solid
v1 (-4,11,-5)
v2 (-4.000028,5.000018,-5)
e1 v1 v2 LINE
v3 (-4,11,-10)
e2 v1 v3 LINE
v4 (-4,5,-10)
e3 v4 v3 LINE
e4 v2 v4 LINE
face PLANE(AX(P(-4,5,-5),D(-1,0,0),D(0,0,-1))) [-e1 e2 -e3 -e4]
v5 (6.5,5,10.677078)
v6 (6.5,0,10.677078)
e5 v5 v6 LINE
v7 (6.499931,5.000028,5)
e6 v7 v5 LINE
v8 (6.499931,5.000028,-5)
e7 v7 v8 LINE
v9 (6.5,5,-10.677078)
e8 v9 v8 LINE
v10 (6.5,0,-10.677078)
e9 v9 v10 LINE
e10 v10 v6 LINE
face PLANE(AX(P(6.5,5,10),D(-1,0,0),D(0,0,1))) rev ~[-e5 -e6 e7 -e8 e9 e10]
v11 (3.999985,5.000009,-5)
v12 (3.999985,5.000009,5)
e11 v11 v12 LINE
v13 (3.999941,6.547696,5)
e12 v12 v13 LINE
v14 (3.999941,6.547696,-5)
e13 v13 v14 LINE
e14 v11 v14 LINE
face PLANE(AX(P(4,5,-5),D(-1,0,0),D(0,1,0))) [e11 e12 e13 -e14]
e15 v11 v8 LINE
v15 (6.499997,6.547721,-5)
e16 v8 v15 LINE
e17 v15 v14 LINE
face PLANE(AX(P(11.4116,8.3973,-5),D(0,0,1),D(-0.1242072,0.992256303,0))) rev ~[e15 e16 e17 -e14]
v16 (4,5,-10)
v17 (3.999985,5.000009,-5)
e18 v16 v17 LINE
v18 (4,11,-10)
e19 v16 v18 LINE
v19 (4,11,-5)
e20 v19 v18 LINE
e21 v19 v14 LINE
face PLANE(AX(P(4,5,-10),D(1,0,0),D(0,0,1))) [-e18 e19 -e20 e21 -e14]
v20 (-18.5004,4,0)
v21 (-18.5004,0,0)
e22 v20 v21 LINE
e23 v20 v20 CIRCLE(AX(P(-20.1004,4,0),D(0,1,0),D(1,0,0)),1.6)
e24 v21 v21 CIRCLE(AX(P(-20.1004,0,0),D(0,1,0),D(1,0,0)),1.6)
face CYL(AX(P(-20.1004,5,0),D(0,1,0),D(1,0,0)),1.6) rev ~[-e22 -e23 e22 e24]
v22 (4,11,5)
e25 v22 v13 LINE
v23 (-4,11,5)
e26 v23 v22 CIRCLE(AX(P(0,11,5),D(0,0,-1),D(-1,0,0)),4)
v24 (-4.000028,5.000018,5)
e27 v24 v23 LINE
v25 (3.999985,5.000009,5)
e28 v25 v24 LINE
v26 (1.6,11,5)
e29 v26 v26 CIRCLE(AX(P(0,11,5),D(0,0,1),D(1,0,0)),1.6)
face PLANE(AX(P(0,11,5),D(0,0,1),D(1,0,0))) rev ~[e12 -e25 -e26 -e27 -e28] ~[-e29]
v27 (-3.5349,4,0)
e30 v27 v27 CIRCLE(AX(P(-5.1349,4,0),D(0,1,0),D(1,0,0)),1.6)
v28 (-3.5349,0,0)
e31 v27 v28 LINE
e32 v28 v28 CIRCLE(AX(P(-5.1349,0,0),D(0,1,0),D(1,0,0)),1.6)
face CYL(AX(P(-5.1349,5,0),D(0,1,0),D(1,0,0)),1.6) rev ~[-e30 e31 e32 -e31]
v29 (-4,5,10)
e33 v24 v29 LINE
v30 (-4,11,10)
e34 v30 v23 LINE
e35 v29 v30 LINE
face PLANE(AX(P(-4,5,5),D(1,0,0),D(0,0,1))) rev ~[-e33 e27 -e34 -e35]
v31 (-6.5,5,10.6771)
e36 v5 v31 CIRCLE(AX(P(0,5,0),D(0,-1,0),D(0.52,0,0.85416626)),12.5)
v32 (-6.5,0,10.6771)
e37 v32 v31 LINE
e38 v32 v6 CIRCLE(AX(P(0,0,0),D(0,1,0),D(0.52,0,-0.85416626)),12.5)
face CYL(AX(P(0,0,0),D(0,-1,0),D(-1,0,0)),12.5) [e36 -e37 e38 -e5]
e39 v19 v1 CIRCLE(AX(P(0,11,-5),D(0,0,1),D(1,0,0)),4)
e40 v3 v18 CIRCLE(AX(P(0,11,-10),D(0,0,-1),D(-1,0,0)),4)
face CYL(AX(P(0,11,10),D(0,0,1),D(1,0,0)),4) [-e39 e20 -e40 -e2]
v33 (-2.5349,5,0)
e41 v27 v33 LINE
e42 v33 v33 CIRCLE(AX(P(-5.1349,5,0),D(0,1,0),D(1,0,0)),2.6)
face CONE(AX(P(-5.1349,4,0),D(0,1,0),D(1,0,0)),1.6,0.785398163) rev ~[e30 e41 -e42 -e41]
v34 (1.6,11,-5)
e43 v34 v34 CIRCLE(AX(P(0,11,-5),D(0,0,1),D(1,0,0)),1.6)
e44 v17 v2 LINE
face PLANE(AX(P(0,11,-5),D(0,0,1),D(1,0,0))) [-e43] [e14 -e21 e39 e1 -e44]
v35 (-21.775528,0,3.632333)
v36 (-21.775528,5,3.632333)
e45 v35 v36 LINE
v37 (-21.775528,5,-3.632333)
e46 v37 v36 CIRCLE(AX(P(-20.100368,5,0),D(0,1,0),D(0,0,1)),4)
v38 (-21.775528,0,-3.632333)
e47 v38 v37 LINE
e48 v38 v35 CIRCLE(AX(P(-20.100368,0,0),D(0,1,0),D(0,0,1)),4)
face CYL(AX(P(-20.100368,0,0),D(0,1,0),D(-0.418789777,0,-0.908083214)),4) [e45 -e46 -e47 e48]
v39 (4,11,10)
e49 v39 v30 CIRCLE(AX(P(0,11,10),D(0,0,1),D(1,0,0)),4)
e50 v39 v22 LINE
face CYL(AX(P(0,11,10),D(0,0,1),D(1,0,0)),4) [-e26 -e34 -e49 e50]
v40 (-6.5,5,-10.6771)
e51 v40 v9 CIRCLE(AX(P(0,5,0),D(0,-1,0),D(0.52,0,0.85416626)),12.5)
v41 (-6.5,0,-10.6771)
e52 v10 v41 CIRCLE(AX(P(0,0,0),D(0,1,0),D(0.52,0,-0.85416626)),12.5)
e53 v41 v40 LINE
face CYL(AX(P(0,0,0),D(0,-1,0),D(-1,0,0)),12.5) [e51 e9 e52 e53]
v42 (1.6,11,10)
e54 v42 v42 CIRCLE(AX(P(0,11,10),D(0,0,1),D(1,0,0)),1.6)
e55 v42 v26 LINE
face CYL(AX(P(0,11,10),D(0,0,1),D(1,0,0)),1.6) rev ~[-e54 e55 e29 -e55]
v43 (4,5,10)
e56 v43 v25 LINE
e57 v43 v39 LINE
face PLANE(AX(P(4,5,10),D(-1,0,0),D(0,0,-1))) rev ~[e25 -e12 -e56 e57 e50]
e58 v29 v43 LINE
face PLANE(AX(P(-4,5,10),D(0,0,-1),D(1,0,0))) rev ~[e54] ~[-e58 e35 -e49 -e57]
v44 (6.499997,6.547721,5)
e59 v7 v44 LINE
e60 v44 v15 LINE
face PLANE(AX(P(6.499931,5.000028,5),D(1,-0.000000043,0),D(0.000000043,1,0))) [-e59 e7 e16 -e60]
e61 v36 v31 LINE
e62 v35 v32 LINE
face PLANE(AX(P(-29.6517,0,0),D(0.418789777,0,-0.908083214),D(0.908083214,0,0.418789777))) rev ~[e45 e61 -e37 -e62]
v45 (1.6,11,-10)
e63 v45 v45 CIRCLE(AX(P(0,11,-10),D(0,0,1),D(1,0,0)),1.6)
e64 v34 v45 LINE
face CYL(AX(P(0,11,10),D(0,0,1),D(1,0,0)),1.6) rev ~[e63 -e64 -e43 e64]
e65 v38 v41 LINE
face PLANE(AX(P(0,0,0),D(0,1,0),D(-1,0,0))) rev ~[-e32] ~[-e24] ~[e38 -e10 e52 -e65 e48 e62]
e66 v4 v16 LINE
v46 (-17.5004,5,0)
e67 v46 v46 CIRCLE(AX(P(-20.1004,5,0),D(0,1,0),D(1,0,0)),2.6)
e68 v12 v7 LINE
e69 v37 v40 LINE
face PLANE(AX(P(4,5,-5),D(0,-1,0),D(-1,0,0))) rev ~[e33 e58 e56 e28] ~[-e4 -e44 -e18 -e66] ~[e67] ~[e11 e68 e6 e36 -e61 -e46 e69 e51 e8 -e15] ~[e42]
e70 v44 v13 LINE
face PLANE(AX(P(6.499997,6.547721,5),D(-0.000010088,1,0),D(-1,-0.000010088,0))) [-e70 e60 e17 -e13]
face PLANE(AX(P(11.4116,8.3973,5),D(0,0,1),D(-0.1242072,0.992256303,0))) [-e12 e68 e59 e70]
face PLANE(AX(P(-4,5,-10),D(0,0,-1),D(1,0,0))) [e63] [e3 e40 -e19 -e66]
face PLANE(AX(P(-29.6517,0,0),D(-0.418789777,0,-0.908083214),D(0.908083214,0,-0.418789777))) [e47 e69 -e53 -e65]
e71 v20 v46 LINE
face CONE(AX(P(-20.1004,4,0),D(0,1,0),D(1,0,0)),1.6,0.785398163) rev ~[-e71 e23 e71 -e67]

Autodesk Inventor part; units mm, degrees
ref_plane "YZ Plane" through (0, 0, 0) normal (1, 0, 0) x (0, 1, 0)
ref_plane "XZ Plane" through (0, 0, 0) normal (0, 1, 0) x (-1, 0, 0)
ref_plane "XY Plane" through (0, 0, 0) normal (0, 0, 1) x (1, 0, 0)
sketch "Sketch1" plane through (0, 0, 0) normal (0, 1, 0) x (-1, 0, 0)
  circle A0 centre (0, 0) radius 12.5
  dimension "d0" = 25
extrude "Extrusion1" add sketch "Sketch1" along normal blind 5
sketch "Sketch2" plane through (0, 5, 0) normal (0, 1, 0) x (1, 0, 0)
  line L0 (0, 5) -> (0, -5)
  line L1 (0, -5) -> (-4, -5)
  line L2 (-4, -5) -> (-4, 5)
  line L3 (-4, 5) -> (0, 5)
  line L4 (0, 5) -> (0, -5)
  line L5 (0, -5) -> (4, -5)
  line L6 (4, -5) -> (4, 5)
  line L7 (4, 5) -> (0, 5)
  line L8 (0, 5) -> (0, -5)
  line L9 (4, -5) -> (-4, -5)
  line L10 (-4, -5) -> (-4, -10)
  line L11 (-4, -10) -> (4, -10)
  line L12 (4, -10) -> (4, -5)
  line L13 (4, 5) -> (-4, 5)
  line L14 (-4, 5) -> (-4, 10)
  line L15 (-4, 10) -> (4, 10)
  line L16 (4, 10) -> (4, 5)
  point P0 (0, 0)
  dimension "d4" = 10
  dimension "d5" = 4
  dimension "d6" = 4
  dimension "d7" = 5
  dimension "d8" = 5
extrude "Extrusion2" add sketch "Sketch2" along normal blind 10 contours L3 L14 L15 L16 L7 | L5 L12 L11 L10 L1
sketch "Sketch3" plane through (-4, 5, 10) normal (0, 0, 1) x (1, 0, 0)
  line L0 (0, 10) -> (8, 10) projected
  line L1 (0, 0) -> (0, 10) projected
  line L2 (8, 0) -> (8, 10) projected
  circle A0 centre (4, 6) radius 4
  circle A1 centre (4, 6) radius 1.6
  point P0 (4, -5)
  point P1 (0, 6)
  point P2 (4, 10)
  point P3 (8, 6)
  dimension "d11" = 3.2
extrude "Extrusion3" cut sketch "Sketch3" against normal through all contours L0 A0 L1 | L0 L2 A0 | A1
sketch "Sketch4" plane through (0, 5, 0) normal (0, 1, 0) x (1, 0, 0)
  circle A0 centre (0, 0) radius 12.5 projected
  line L0 (4, -5) -> (4, -10) projected
  line L1 (4, -10) -> (14.8106, -10)
  line L2 (14.8106, -10) -> (14.8106, 15.6874)
  line L3 (14.8106, 15.6874) -> (4, 15.6874)
  line L4 (4, 15.6874) -> (4, -10)
  line L5 (14.8106, 15.6874) -> (4, 15.6874)
  line L6 (4, 15.6874) -> (4, -20.4825)
  line L7 (4, -20.4825) -> (14.8106, -20.4825)
  line L8 (14.8106, -20.4825) -> (14.8106, 15.6874)
  line L9 (4, 15.6874) -> (6.5, 15.6874)
  line L10 (6.5, 15.6874) -> (6.5, -20.4825)
  line L11 (6.5, -20.4825) -> (4, -20.4825)
  line L12 (4, -20.4825) -> (4, 15.6874)
  point P0 (6.5, 10.6771)
  point P1 (6.5, -10.6771)
  dimension "d14" = 2.5
extrude "Extrusion4" cut sketch "Sketch4" against normal blind 10 contours A0 L1 L10 | A0 L10 L1
sketch "Sketch5" plane through (0, 0, 0) normal (0, -1, 0) x (1, 0, 0)
  line L0 (6.5, -10.6771) -> (6.5, 10.6771) projected
  arc A0 (6.5, 10.6771) -> (6.5, -10.6771) centre (0, 0) ccw projected
  line L1 (0, 0) -> (-29.6517, 0)
  line L2 (-29.6517, 0) -> (-6.5, 10.6771)
  arc A1 (6.5, 10.6771) -> (6.5, -10.6771) centre (0, 0) ccw projected
  line L3 (-29.6517, 0) -> (-6.5, -10.6771)
  point P0 (-6.5, 10.6771)
extrude "Extrusion5" add sketch "Sketch5" against normal blind 5 contours L3 L1 A0 | A0 L1 L2
fillet "Fillet1" radius 4 1 edges at (-29.6517, 2.5, 0)
sketch "Sketch6" plane through (0, 5, 0) normal (0, 1, 0) x (1, 0, 0)
  arc A0 (-21.7755, 3.6323) -> (-21.7755, -3.6323) centre (-20.1004, 0) ccw projected
  line L0 (-21.7755, -3.6323) -> (-6.5, -10.6771) projected
  arc A1 (-6.5, -10.6771) -> (6.5, -10.6771) centre (0, 0) ccw projected
  line L1 (6.5, -10.6771) -> (6.5, 10.6771) projected
  arc A2 (6.5, 10.6771) -> (-6.5, 10.6771) centre (0, 0) ccw projected
  line L2 (-6.5, 10.6771) -> (-21.7755, 3.6323) projected
  line L3 (4, -5) -> (4, -10) projected
  line L4 (4, -10) -> (-4, -10) projected
  line L5 (-4, -10) -> (-4, -5) projected
  line L6 (-4, -5) -> (4, -5) projected
  line L7 (4, 10) -> (4, 5) projected
  line L8 (4, 5) -> (-4, 5) projected
  line L9 (-4, 5) -> (-4, 10) projected
  line L10 (-4, 10) -> (4, 10) projected
  circle A3 centre (-20.1004, 0) radius 1.6
  circle A4 centre (-5.1349, 0) radius 1.6
  dimension "d20" = 3.2
  dimension "d21" = 3.2
extrude "Extrusion6" cut sketch "Sketch6" against normal blind 10 contours A3 | A4
chamfer "Chamfer1" distance 1 angle 45 2 edges at (-21.7004, 5, 0) (-6.7349, 5, 0)
ref_plane "Work Plane1" through (11.4116, 8.3973, 5) normal (0, 0, 1) x (-0.1242072, 0.9922563, 0)
sketch "Sketch8" plane through (11.4116, 8.3973, 5) normal (0, 0, 1) x (-0.1242072, 0.9922563, 0)
  line L0 (-1.1462, 18.1949) -> (-6.1075, 18.8159) projected
  line L1 (-6.1075, 18.8159) -> (-7.7222, 5.9166) projected
  line L2 (-7.7222, 5.9166) -> (-2.7609, 5.2956) projected
  line L3 (-1.1462, 18.1949) -> (-2.7609, 5.2956) projected
  arc A0 (3.5032, 7.031) -> (4.4968, 14.969) centre (4, 11) ccw projected
  line L4 (-1.4567, 15.7143) -> (4.4968, 14.969) projected
  line L5 (-2.4504, 7.7762) -> (-1.4567, 15.7143) projected
  line L6 (-2.4504, 7.7762) -> (3.5032, 7.031) projected
  circle A1 centre (4, 11) radius 1.6 projected
  line L7 (0, 2) -> (8, 2) projected
  line L8 (8, 2) -> (8, 11) projected
  arc A2 (8, 11) -> (0, 11) centre (4, 11) ccw projected
  line L9 (0, 2) -> (0, 11) projected
  circle A3 centre (4, 11) radius 1.65 projected
  line L10 (-2.7609, 5.2956) -> (0, 4.95)
  line L11 (0, 4.95) -> (0, 15.5319)
  point P0 (-6.9148, 12.3663)
  point P1 (0, 11)
  point P2 (-1.4567, 15.7143)
extrude "Extrusion7" add sketch "Sketch8" against normal up to surface (10 mm away) contours L4 L11 L9 L6 L3 | L6 L9 L10 L3
sketch "Sketch9" plane through (0, 11, -5) normal (0, 0, 1) x (1, 0, 0)
  circle A0 centre (0, 0) radius 1.6 projected
  line L0 (-4, -4.5319) -> (4, -3.5305) projected
  line L1 (4, -3.5305) -> (4, 0) projected
  arc A1 (4, 0) -> (-4, 0) centre (0, 0) ccw projected
  line L2 (-4, -4.5319) -> (-4, 0) projected
  arc A2 (4, 0) -> (-4, 0) centre (0, 0) ccw projected
  line L3 (-4, -6) -> (-4, 0) projected
  line L4 (4, -6) -> (-4, -6) projected
  line L5 (4, -6) -> (4, 0) projected
  circle A3 centre (0, 0) radius 1.6 projected
  point P0 (0, -11)
  point P1 (4, -3.5305)
extrude "Extrusion8" cut sketch "Sketch9" along normal up to surface (10 mm away) contours L0 L5 L4 L3
sketch "Sketch10" plane through (11.4116, 8.3973, 5) normal (0, 0, 1) x (0.9922563, 0.1242072, 0)
  line L0 (-7.7762, -2.4504) -> (-7.4695, 0) projected
  line L1 (-5.2956, -2.7609) -> (-7.7762, -2.4504) projected
  line L2 (-5.2956, -2.7609) -> (-4.95, 0) projected
  line L3 (-4.95, 0) -> (-7.4695, 0) projected
  line L4 (-5.2956, -2.7609) -> (-4.95, 0) projected
  line L5 (-5.1033, -1.2252) -> (-7.584, -0.9147)
  line L6 (-7.7762, -2.4504) -> (-7.031, 3.5032) projected
  point P0 (-12.3663, -6.9148)
  point P1 (-7.584, -0.9147)
  point P2 (-5.1033, -1.2252)
extrude "Extrusion9" cut sketch "Sketch10" against normal blind 10 contours L0 L3 L2 L5
properties material "PC/ABS Plastic"
